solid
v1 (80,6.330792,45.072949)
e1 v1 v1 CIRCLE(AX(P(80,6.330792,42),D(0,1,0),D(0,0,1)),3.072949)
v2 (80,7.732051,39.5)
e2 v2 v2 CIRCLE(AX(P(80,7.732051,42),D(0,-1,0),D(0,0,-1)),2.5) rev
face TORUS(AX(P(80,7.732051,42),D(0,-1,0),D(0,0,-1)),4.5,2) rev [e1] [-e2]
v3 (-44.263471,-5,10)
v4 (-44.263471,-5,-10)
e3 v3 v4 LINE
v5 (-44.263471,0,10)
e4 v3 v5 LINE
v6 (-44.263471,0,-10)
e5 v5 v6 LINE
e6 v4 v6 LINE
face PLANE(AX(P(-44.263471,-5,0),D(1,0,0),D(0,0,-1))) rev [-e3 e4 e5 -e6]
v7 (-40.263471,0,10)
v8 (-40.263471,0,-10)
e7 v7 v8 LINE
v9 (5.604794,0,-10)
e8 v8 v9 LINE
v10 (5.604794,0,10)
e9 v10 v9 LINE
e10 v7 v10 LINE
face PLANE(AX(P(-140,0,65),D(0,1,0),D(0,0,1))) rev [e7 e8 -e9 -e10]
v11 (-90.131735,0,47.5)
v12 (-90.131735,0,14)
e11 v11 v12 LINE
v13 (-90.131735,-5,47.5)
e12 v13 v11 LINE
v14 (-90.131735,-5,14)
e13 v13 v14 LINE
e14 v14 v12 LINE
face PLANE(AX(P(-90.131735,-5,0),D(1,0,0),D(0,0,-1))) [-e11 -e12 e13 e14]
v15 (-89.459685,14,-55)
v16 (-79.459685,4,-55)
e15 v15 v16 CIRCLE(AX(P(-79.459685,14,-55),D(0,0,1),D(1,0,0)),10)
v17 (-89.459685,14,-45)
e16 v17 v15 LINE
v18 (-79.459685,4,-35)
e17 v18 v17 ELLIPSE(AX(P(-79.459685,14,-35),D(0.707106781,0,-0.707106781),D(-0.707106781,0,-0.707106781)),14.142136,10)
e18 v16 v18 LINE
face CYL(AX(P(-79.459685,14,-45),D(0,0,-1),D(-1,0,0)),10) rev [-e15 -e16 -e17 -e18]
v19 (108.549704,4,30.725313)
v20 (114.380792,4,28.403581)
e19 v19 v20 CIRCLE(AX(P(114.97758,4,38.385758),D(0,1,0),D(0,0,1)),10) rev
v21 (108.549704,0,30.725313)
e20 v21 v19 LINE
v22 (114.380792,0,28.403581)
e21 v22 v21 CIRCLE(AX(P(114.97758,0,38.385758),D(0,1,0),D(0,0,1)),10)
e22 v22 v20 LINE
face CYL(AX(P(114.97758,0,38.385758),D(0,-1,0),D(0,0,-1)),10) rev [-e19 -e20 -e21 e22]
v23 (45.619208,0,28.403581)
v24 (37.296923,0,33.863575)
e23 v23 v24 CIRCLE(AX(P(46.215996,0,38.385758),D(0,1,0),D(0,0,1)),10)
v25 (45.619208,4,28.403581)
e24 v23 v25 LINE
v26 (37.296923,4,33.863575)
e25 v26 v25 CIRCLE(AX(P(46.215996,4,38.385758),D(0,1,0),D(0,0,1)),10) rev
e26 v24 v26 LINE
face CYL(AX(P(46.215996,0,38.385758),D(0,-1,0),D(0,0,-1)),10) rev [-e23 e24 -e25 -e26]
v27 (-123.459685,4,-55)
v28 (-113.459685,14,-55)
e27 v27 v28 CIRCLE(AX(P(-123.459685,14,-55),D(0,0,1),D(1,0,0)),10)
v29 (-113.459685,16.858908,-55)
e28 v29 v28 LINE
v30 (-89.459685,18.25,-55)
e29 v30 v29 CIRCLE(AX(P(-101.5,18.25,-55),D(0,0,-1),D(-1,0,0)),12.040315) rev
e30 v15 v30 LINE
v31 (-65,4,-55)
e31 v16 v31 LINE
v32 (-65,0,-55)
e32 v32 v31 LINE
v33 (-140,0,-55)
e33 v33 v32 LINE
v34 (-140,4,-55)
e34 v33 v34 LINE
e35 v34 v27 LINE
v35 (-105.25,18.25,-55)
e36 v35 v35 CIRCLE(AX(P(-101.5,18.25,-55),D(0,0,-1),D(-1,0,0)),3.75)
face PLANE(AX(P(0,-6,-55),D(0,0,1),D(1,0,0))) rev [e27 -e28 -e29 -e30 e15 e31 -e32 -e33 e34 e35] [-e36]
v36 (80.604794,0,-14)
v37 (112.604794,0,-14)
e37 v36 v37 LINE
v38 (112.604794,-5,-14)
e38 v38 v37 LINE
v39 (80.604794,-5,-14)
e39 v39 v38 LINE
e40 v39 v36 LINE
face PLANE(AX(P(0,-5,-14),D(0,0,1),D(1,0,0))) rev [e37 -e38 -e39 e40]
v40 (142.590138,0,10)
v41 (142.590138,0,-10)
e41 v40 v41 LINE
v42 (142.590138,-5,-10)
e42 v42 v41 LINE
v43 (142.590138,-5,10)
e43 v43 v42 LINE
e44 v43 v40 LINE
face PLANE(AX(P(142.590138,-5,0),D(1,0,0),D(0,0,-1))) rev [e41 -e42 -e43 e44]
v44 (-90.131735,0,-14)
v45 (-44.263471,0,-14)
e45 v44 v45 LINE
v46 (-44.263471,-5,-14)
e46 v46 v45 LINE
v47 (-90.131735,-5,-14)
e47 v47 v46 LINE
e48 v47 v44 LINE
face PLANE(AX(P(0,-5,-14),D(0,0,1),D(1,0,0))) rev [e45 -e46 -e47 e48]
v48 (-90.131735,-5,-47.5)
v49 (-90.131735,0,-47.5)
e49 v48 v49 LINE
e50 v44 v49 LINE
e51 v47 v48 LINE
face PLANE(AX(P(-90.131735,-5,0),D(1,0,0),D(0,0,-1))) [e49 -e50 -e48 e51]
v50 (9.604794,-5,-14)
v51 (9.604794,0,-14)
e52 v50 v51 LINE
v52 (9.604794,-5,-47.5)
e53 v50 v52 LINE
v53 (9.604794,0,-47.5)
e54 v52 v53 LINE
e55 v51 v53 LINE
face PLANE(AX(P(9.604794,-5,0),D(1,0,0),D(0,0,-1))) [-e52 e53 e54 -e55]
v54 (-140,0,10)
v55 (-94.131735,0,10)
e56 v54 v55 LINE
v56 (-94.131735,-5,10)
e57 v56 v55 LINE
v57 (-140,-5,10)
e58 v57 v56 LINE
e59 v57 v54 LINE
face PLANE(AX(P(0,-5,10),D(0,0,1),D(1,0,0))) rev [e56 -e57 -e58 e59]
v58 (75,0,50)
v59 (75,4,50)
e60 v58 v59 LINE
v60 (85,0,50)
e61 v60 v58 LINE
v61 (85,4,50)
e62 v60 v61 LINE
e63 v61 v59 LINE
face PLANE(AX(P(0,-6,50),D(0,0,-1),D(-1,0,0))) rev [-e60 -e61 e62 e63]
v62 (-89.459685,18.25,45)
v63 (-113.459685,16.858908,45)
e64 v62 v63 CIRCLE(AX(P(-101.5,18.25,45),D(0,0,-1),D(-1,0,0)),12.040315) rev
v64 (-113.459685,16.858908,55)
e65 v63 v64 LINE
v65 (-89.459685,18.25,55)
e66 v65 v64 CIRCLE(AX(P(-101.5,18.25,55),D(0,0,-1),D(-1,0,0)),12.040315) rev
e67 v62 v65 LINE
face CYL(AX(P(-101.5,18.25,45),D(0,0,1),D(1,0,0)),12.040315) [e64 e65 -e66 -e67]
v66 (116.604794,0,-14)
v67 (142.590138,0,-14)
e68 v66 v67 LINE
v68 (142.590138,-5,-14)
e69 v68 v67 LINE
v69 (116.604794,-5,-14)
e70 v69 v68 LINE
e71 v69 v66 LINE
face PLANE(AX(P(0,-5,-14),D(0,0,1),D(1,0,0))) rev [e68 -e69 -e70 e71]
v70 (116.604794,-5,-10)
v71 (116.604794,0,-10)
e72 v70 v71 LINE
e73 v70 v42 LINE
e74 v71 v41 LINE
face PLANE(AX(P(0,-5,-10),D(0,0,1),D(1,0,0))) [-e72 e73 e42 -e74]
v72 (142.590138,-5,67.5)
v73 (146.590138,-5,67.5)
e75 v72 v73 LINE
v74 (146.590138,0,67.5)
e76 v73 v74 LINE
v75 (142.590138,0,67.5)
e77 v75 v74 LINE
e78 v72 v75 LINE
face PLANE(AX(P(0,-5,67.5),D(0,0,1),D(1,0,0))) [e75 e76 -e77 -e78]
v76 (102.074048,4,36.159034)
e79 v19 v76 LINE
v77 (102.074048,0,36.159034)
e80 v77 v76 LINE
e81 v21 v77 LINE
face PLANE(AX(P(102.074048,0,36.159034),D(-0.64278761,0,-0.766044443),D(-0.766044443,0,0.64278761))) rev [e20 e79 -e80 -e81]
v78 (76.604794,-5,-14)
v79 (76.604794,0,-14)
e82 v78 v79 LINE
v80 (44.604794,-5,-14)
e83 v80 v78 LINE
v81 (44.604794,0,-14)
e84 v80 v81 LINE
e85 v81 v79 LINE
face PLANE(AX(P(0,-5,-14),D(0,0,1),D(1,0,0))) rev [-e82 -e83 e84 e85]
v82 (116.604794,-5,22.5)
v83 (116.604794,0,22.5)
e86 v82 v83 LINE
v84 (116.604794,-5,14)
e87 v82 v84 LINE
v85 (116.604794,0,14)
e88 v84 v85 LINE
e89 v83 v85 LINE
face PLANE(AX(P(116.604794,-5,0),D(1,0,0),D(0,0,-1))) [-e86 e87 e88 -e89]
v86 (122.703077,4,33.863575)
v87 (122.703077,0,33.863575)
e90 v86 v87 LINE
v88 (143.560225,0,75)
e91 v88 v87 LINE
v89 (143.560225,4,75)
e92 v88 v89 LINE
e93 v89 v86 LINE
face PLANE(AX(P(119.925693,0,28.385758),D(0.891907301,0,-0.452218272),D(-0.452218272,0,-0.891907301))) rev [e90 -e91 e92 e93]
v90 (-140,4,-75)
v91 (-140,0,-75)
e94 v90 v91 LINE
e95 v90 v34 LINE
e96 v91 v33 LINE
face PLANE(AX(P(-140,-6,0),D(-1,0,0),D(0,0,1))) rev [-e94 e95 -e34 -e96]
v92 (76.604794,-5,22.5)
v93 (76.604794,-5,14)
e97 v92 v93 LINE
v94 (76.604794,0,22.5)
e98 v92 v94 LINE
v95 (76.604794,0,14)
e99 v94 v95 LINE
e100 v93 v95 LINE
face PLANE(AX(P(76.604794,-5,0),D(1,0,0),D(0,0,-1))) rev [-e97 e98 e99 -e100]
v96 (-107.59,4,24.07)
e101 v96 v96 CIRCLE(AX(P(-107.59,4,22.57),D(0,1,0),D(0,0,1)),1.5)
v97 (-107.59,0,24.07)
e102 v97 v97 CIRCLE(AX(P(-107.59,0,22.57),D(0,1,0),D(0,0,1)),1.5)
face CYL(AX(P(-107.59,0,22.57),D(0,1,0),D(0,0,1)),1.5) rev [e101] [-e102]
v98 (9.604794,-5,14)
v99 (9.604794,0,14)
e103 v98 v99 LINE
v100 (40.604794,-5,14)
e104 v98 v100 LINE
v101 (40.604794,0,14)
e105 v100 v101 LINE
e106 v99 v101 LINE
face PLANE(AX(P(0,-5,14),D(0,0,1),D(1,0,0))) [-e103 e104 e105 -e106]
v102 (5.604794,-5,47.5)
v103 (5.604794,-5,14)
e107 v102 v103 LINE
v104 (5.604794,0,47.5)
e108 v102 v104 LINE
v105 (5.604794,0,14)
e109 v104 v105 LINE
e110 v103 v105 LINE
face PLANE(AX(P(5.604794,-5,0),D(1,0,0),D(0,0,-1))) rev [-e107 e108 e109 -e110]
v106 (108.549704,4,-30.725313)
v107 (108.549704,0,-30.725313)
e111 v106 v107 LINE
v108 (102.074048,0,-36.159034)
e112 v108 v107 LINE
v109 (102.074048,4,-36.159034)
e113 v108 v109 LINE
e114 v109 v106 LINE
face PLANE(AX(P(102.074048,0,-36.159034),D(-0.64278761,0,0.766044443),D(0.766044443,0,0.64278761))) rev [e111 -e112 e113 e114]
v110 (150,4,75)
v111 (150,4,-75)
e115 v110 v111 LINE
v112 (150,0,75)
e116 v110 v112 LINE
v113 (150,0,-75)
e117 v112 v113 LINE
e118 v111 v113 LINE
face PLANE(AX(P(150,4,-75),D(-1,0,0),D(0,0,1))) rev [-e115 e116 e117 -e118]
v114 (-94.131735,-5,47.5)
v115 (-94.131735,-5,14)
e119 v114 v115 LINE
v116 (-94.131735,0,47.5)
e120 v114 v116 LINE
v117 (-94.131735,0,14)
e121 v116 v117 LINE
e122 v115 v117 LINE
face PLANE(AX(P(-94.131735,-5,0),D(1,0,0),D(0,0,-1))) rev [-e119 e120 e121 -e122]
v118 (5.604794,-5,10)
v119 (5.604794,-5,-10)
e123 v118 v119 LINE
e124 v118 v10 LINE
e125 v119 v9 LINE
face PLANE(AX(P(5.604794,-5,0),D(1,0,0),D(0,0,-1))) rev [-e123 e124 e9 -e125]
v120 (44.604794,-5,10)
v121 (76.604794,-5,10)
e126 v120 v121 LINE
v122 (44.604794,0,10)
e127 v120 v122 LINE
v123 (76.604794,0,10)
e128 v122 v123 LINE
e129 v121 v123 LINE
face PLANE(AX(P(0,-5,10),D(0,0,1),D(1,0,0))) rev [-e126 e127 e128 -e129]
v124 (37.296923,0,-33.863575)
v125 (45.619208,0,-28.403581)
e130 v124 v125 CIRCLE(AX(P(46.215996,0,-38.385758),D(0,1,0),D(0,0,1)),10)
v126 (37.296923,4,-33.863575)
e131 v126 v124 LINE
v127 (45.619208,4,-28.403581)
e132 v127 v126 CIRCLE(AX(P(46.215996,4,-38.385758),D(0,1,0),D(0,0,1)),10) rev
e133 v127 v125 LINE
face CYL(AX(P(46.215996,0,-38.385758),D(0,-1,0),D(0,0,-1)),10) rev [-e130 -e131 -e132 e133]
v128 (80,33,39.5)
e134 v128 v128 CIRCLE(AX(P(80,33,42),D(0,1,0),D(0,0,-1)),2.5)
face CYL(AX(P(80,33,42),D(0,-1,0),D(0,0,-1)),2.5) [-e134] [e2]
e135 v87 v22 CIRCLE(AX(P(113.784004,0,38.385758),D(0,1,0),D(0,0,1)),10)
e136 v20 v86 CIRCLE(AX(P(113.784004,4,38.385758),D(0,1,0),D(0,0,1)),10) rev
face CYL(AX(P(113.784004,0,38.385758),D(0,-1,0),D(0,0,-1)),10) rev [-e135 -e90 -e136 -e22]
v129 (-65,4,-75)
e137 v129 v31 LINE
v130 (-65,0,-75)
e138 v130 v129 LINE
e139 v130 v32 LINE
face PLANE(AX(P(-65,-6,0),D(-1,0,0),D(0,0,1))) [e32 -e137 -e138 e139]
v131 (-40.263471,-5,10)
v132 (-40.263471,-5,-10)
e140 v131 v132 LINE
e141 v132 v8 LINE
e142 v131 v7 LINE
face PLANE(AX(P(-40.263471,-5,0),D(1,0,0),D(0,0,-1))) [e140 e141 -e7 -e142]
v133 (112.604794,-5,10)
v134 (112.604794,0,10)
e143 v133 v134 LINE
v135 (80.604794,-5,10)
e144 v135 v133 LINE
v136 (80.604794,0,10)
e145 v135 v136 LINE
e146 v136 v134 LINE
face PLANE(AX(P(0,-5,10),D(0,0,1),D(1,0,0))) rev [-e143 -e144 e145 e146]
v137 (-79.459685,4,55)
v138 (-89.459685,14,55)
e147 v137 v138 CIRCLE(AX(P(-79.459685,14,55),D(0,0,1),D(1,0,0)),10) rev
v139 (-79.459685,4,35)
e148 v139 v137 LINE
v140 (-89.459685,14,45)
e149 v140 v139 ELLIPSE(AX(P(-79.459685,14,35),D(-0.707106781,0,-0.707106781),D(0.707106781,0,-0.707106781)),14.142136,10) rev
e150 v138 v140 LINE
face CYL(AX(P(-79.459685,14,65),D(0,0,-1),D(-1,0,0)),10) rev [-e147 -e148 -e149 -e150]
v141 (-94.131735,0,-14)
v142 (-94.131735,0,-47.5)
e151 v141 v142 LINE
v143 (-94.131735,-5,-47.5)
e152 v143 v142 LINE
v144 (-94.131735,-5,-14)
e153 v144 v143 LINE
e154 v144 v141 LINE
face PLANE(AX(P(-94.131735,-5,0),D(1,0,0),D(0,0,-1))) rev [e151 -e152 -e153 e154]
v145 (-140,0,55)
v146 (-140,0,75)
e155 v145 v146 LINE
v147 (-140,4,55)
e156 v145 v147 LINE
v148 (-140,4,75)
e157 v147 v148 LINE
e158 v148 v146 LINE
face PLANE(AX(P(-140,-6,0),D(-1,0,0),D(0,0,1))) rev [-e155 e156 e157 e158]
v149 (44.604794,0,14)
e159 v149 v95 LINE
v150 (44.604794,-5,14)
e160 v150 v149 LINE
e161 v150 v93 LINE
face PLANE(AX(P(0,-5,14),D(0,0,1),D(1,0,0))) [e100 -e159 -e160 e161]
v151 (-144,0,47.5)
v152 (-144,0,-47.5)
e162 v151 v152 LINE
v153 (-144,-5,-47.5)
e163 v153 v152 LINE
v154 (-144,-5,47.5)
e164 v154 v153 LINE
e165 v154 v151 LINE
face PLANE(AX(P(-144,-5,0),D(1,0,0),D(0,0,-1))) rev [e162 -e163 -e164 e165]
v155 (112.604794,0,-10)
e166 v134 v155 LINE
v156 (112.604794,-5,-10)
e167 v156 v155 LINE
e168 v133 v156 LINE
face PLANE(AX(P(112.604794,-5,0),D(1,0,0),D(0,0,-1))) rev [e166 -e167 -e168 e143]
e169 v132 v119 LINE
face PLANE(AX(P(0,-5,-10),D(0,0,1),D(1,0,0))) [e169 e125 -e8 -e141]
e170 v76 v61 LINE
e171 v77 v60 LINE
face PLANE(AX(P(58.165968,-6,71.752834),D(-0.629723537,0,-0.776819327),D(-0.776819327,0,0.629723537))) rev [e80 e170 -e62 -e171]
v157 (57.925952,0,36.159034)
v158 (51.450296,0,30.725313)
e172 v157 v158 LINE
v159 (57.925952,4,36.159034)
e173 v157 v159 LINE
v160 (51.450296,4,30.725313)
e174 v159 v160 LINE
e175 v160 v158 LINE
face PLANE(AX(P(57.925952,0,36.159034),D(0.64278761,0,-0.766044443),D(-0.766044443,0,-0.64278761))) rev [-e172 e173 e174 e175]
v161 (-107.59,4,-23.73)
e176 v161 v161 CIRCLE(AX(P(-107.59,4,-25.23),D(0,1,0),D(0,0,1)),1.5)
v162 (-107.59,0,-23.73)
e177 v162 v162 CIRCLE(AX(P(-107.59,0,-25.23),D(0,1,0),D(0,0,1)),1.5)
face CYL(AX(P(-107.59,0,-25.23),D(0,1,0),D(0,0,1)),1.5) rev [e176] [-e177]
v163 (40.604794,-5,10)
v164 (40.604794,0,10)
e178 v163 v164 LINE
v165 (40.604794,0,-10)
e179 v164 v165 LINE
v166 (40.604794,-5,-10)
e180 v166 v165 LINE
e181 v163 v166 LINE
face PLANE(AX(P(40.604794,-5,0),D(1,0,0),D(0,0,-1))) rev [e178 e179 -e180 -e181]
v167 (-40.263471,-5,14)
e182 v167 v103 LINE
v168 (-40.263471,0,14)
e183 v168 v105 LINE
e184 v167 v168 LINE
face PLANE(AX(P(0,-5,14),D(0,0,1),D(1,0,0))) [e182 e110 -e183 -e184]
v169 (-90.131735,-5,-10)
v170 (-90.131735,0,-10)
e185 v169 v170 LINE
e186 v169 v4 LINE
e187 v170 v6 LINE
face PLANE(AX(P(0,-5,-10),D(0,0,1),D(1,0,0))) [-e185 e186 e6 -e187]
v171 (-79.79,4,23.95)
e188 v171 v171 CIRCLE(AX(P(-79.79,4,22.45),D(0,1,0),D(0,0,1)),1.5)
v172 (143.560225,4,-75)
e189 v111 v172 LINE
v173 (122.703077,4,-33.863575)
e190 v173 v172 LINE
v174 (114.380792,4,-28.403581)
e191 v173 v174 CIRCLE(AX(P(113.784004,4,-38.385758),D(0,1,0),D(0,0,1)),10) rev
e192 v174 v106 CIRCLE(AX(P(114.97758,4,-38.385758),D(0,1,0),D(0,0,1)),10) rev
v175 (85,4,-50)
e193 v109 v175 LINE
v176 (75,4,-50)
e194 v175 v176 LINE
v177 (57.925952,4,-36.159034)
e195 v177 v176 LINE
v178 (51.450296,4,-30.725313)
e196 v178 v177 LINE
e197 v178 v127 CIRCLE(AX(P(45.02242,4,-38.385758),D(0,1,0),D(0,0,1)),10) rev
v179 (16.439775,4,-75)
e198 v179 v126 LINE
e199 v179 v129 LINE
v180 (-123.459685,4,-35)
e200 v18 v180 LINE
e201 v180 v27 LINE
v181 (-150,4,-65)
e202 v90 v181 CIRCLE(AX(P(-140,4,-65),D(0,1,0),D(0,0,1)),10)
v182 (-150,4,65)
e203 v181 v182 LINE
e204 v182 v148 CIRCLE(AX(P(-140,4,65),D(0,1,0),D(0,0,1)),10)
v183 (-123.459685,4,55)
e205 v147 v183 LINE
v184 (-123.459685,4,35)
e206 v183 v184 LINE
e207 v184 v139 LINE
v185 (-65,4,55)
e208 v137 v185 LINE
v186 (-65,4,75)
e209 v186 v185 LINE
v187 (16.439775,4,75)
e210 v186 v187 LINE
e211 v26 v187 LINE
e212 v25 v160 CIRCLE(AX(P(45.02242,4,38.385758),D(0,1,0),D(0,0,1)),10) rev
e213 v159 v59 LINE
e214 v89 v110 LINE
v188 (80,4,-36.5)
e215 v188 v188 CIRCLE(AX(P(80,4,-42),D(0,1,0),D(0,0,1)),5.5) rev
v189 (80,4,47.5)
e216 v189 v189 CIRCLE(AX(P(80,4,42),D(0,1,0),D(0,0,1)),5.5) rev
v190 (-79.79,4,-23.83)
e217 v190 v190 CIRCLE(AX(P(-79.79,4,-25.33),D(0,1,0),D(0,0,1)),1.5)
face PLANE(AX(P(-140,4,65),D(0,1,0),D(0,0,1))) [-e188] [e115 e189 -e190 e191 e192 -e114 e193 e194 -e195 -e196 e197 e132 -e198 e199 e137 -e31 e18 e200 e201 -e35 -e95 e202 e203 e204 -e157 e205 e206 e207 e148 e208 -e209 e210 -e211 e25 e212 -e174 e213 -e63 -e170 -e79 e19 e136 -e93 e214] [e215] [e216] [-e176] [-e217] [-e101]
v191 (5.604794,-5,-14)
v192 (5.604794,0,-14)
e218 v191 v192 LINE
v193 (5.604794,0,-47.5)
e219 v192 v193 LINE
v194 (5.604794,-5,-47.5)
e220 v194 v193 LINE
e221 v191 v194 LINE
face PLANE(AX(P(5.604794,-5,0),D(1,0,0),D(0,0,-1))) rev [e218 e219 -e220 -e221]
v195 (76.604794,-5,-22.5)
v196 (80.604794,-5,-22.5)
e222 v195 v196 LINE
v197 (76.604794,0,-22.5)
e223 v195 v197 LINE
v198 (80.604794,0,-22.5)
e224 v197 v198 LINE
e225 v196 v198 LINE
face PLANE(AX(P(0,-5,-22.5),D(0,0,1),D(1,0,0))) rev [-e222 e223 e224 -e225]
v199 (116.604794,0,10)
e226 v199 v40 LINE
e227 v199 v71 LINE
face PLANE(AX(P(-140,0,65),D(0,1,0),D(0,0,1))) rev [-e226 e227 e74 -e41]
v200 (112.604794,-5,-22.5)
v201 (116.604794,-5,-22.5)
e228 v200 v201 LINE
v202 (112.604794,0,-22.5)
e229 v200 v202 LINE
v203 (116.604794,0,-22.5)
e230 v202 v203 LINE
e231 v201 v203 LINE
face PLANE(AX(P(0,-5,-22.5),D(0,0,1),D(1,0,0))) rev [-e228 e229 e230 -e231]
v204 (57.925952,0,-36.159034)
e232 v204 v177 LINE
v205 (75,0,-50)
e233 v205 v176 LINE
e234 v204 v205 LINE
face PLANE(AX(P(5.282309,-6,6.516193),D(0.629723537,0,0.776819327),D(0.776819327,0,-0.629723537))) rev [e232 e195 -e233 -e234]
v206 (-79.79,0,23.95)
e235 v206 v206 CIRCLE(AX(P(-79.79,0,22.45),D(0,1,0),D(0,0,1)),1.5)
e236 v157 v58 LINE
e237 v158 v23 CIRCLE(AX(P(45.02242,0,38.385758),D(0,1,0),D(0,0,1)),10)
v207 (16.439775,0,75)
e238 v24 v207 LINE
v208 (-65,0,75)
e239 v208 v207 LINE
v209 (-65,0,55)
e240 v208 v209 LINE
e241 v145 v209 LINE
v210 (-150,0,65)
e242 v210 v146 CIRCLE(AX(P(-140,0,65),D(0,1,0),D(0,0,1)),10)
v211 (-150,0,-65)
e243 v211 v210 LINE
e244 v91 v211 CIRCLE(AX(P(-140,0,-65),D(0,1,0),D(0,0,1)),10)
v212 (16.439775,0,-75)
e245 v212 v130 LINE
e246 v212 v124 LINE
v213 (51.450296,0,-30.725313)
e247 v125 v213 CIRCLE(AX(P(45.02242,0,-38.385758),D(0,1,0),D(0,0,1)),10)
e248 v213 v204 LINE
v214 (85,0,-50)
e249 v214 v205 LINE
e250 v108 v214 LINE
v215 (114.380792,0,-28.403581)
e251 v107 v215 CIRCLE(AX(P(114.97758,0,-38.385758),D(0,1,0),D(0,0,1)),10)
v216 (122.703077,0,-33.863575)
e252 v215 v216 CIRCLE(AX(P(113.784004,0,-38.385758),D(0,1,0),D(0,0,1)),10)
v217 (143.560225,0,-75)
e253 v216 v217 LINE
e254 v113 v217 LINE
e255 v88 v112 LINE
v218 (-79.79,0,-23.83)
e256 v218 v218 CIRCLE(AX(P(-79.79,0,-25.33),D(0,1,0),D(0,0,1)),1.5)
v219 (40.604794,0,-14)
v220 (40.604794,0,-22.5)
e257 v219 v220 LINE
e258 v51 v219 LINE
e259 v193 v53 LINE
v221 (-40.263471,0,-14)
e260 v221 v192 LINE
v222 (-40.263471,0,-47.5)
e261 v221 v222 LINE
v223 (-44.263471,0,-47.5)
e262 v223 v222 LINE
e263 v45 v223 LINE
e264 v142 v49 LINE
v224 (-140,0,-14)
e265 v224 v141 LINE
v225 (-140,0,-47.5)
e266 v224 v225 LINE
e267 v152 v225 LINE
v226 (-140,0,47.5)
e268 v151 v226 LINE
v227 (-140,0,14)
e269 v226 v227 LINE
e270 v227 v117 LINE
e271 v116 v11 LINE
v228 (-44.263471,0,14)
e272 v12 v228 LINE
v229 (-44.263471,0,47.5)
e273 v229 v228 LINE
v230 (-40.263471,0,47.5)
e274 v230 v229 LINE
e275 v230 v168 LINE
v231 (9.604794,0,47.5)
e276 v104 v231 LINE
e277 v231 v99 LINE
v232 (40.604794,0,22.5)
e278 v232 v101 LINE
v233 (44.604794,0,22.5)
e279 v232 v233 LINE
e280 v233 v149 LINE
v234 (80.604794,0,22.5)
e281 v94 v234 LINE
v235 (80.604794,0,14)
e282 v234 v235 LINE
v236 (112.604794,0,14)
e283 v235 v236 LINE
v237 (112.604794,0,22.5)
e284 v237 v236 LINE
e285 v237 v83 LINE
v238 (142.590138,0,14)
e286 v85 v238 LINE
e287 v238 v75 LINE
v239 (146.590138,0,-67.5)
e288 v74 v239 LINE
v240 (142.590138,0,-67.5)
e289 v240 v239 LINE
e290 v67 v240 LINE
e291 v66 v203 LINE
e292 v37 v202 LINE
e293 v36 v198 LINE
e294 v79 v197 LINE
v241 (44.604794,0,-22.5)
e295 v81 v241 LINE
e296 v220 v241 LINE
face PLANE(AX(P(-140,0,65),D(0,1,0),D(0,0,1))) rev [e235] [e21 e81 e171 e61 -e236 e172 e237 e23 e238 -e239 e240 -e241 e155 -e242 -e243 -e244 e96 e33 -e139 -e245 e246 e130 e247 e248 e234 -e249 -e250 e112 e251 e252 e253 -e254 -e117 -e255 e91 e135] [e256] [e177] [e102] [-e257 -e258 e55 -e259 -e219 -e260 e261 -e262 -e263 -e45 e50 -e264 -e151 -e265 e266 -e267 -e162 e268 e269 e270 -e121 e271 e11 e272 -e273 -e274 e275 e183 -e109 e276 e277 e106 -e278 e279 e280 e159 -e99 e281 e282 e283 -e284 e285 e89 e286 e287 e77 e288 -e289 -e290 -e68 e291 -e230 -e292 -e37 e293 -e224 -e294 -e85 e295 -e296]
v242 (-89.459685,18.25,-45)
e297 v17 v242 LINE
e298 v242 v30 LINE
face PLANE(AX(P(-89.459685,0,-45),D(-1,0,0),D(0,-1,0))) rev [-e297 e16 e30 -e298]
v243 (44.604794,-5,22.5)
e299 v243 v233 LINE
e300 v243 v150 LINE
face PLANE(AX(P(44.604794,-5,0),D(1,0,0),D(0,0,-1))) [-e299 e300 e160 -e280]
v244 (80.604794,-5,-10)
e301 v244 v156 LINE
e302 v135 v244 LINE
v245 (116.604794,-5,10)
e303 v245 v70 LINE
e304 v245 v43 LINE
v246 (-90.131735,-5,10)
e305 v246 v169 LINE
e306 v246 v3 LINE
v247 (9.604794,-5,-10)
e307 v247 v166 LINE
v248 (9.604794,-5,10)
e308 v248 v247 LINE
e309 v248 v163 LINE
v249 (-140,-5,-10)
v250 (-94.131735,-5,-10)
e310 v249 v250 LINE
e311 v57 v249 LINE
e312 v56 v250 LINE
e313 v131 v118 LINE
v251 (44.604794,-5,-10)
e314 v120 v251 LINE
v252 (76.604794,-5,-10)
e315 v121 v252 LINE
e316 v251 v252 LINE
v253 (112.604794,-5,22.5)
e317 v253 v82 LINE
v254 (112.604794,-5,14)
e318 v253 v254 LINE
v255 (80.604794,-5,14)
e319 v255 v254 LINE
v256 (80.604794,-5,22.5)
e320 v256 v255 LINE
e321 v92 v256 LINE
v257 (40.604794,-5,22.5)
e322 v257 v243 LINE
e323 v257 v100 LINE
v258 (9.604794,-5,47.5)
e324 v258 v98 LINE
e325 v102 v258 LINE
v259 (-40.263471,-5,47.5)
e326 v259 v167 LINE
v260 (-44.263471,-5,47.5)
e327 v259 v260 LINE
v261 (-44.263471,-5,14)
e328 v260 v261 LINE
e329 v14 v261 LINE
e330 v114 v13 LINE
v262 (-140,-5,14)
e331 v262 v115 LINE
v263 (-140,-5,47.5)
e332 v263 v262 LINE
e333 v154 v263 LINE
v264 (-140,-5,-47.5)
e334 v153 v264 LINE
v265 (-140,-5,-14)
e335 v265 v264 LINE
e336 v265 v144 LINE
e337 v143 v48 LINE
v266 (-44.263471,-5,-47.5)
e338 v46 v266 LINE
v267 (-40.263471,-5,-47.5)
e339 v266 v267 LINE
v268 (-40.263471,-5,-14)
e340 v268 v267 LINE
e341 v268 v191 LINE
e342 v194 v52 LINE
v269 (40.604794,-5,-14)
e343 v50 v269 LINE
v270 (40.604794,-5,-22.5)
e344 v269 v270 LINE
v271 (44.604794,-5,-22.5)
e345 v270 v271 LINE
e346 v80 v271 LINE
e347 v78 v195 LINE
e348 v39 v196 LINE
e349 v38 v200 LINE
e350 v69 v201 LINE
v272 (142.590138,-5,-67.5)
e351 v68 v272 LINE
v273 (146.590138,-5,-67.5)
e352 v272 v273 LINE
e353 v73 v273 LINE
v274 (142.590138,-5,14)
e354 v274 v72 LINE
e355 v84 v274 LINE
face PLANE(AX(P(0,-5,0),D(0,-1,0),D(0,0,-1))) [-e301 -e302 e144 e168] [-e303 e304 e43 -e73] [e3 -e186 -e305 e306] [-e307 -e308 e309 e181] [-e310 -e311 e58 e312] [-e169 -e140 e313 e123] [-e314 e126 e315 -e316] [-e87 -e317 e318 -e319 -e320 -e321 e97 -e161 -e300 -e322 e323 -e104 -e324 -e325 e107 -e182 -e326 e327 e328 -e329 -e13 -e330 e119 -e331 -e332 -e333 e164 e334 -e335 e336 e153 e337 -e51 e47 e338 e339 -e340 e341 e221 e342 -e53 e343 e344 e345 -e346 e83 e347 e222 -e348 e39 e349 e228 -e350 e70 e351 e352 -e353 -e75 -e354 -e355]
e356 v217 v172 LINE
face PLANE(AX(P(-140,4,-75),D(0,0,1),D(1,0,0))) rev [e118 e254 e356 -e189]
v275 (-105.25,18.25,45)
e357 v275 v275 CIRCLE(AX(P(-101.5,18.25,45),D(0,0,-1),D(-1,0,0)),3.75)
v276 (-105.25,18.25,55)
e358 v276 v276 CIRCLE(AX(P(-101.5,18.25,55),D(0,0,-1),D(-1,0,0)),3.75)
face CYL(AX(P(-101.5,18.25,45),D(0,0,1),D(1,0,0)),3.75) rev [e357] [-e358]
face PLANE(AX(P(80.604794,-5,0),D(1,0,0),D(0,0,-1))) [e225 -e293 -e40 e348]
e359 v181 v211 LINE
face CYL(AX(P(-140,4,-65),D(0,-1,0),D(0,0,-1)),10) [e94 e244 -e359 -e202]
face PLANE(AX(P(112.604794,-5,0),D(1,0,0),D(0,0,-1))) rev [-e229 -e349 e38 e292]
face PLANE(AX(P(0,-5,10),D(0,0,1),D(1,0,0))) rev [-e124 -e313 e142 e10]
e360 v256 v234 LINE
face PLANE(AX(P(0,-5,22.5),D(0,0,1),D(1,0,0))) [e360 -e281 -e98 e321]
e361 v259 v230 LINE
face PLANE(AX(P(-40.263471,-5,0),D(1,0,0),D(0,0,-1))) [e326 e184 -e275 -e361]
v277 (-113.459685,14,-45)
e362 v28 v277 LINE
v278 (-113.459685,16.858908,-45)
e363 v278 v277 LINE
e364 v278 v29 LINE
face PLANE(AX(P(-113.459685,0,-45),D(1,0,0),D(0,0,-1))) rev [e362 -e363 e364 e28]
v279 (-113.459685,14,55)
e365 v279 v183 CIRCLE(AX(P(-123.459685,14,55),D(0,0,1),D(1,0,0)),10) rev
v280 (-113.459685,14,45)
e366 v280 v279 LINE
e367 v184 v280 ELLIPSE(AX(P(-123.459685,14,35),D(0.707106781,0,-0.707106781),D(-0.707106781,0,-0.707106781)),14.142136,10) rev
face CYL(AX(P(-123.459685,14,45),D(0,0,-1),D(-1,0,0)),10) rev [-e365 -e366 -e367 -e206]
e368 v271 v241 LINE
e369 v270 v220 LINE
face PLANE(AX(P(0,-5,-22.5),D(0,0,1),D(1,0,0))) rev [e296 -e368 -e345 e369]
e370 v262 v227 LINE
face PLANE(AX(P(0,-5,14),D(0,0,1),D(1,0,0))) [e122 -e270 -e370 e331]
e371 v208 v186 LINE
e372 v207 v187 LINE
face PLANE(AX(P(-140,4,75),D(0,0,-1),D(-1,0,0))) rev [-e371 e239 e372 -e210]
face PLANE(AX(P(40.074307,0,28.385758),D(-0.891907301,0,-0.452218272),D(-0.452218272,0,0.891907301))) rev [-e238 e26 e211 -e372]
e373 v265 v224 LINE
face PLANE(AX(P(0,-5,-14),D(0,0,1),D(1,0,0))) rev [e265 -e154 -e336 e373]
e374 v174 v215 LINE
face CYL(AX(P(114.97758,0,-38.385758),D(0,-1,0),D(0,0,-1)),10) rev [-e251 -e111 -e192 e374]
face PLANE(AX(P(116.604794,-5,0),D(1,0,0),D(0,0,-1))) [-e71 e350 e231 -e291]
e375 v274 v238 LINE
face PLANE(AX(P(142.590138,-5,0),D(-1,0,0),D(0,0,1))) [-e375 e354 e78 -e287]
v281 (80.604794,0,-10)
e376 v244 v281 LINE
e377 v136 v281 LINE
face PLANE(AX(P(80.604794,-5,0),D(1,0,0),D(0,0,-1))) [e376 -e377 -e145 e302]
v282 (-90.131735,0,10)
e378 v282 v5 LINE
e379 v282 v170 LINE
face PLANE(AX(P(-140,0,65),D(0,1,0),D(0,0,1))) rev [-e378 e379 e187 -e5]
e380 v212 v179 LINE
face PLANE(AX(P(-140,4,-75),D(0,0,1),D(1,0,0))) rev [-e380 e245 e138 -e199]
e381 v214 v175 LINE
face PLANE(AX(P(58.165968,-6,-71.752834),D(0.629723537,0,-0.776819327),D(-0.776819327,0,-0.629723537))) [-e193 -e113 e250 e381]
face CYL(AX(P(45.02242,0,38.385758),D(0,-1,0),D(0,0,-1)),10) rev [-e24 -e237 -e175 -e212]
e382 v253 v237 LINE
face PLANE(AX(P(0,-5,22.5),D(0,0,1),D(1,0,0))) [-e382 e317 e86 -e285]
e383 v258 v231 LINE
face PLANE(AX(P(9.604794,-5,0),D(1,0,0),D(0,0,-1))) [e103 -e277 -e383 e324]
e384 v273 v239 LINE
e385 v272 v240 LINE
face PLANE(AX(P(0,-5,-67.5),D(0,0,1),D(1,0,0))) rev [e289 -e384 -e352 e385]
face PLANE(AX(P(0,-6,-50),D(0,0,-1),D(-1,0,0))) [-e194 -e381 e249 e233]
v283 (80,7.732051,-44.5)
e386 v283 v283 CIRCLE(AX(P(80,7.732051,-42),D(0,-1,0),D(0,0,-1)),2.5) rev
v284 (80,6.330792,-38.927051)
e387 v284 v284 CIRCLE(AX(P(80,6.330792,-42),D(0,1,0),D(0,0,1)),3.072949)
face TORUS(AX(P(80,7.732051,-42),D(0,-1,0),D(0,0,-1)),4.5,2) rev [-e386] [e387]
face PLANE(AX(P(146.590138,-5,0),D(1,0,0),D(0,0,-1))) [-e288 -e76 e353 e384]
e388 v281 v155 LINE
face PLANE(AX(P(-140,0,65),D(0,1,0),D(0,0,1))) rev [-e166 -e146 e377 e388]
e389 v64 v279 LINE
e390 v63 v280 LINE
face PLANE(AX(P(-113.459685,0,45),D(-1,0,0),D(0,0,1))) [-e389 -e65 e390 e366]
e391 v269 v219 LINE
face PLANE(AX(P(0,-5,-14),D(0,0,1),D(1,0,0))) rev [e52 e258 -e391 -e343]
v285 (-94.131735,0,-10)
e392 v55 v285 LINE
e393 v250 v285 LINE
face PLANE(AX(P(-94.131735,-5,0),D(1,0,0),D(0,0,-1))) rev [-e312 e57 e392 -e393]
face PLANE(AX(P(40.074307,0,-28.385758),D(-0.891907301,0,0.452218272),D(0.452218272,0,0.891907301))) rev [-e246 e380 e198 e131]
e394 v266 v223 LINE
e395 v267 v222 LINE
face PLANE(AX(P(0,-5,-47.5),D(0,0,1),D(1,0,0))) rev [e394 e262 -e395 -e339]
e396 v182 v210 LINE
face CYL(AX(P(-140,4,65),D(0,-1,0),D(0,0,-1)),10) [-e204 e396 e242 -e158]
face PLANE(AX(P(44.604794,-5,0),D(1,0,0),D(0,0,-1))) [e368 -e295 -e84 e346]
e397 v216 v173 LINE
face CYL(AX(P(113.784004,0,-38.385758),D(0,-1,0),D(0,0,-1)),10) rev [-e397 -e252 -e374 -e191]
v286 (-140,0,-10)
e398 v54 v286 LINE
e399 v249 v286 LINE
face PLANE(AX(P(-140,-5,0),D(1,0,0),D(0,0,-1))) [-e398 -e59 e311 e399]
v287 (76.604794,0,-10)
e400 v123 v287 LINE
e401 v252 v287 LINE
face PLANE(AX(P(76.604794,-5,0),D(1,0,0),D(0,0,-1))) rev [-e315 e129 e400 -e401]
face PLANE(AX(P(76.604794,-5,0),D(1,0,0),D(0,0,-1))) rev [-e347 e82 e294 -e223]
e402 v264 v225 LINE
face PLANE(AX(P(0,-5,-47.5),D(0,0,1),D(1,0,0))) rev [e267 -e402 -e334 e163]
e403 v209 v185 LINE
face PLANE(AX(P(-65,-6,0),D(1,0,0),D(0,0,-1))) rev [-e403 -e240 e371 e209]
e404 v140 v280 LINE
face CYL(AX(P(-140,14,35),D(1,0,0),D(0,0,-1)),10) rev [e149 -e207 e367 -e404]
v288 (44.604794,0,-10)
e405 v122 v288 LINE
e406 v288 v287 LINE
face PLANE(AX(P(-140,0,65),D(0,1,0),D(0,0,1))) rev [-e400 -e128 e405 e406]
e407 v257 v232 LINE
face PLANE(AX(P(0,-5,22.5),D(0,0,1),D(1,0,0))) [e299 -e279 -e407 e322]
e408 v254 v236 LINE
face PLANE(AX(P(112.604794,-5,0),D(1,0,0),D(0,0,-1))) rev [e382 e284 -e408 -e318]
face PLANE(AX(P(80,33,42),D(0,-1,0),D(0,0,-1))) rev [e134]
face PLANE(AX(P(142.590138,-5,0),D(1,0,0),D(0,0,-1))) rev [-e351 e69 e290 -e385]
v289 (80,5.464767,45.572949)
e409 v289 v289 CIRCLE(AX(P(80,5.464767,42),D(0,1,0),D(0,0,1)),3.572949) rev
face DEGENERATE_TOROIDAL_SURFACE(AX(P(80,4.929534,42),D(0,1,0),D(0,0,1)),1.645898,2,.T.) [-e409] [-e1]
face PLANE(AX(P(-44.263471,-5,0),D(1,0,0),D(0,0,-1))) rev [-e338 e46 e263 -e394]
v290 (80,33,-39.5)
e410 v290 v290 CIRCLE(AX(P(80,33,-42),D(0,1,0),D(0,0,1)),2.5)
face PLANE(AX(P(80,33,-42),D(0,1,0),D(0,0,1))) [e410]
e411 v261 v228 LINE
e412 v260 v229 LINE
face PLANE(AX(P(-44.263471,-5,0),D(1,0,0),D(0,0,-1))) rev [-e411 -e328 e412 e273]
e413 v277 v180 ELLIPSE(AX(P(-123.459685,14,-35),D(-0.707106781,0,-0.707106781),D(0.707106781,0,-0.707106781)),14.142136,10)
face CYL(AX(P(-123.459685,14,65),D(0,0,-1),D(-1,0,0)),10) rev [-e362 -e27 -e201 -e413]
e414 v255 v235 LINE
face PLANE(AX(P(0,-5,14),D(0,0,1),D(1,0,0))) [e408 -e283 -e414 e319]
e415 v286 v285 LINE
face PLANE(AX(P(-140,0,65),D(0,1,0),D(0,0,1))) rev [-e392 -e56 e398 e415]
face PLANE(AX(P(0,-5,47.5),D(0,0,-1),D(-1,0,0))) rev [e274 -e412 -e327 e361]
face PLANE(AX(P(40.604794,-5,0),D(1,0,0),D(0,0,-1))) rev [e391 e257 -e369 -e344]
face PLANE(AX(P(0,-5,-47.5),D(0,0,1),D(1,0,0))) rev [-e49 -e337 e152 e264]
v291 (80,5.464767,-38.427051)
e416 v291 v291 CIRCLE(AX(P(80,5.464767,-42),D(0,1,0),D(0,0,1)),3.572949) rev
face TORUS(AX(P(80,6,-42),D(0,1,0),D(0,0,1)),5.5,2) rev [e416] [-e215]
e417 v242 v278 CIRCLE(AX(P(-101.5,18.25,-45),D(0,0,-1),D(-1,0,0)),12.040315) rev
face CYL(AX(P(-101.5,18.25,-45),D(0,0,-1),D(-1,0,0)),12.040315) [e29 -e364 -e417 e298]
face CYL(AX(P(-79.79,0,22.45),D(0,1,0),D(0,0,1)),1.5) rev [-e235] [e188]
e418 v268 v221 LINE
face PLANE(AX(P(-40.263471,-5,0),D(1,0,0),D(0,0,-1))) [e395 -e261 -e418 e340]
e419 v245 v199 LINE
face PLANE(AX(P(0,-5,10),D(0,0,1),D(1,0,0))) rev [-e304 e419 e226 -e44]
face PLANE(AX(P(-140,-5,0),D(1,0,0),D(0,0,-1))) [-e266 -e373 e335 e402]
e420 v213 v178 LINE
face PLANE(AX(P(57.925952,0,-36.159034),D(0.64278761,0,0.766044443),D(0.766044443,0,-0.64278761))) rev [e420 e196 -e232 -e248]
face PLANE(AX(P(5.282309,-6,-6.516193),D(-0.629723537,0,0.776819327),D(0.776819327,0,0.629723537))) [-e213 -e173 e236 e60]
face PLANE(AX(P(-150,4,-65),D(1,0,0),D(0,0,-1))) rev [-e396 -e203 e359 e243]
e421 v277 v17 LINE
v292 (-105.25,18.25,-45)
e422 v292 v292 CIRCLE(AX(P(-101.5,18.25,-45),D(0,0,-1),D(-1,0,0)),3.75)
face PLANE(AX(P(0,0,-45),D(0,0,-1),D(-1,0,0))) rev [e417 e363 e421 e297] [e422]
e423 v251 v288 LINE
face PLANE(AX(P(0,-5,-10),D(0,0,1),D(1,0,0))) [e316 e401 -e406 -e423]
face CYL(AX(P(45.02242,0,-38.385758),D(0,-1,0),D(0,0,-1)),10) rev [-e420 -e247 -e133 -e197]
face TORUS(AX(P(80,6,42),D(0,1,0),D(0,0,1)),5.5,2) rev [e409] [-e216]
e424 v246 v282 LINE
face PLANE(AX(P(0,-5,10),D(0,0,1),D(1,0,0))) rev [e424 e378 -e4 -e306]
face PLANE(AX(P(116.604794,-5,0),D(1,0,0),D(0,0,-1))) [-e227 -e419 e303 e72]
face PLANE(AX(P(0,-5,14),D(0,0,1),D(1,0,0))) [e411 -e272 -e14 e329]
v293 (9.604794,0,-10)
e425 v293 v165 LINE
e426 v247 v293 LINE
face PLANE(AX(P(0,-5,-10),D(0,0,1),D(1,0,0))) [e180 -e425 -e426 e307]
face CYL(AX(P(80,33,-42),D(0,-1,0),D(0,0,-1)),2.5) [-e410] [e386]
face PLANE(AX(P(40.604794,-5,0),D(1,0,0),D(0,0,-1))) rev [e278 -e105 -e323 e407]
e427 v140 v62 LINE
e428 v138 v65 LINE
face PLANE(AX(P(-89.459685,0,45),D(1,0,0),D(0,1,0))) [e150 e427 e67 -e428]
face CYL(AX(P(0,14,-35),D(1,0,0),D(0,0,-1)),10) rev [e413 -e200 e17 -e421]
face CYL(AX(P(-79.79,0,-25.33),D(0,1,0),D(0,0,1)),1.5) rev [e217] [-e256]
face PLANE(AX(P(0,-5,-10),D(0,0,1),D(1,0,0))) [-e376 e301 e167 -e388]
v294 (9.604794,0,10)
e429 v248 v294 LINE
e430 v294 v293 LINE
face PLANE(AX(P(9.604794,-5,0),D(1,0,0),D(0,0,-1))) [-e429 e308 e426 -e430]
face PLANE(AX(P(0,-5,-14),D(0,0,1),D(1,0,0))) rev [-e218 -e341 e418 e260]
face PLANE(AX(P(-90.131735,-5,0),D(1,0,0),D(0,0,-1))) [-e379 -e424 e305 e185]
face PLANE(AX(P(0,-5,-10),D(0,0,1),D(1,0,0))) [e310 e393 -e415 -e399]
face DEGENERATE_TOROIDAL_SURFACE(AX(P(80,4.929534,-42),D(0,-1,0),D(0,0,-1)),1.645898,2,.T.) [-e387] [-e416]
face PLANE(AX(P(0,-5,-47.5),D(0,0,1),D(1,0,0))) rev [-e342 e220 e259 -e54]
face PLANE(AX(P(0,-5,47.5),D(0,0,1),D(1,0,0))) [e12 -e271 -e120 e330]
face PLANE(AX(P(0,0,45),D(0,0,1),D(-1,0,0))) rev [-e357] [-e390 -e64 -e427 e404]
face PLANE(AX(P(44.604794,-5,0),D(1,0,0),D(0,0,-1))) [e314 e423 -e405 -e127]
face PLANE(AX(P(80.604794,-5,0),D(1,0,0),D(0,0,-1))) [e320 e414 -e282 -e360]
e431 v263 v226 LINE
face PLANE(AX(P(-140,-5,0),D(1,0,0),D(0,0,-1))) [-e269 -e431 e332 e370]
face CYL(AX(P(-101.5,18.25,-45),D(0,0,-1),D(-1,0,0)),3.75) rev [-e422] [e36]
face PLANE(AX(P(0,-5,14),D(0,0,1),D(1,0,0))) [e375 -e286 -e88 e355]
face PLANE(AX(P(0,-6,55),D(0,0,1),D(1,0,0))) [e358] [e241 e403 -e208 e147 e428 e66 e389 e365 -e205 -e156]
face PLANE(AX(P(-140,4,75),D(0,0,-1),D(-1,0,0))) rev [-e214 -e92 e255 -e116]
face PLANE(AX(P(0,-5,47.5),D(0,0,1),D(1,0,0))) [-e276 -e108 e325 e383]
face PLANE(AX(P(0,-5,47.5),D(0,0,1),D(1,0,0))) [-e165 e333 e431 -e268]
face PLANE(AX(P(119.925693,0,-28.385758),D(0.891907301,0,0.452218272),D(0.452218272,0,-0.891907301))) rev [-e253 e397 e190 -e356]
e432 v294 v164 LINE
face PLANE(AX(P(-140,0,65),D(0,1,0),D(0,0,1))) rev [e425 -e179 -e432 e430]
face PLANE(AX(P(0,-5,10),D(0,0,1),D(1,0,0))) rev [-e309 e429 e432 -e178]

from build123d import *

# Parameters (mm, degrees)
BOSS_EXTRUDE1_DEPTH      = 4
CROQUIS3_W               = 75
CROQUIS3_H               = 20
CORTAR_EXTRUIR1_DEPTH    = 10
CROQUIS4_R               = 3.5
SALIENTE_EXTRUIR1_DEPTH  = 2
CROQUIS5_R               = 2.5
SALIENTE_EXTRUIR2_DEPTH  = 27
CORTAR_EXTRUIR3_DEPTH    = 171.194006945
REDONDEO2_R              = 2
REDONDEO3_R              = 2
REDONDEO4_R              = 2
REDONDEO5_R              = 2
REDONDEO6_R              = 2
REDONDEO7_R              = 10
CROQUIS9_R               = 1.5
CORTAR_EXTRUIR4_DEPTH    = 171.194006945
CROQUIS15_R              = 3.75
SALIENTE_EXTRUIR3_DEPTH  = 10
REDONDEO8_R              = 10
REDONDEO8_OF_SIMETR_A2_R = 10
CROQUIS16_W              = 45.868264646
CROQUIS16_H              = 20
CROQUIS16_W_2            = 25.985344102
CROQUIS16_W_3            = 31
CROQUIS16_W_4            = 32
SALIENTE_EXTRUIR5_DEPTH  = 5


# Some blends are built 0.0001 mm under size
with BuildPart() as part:
    # Sketch1 → Boss-Extrude1 (new body)
    with BuildSketch(Plane(origin=(0, 0, 0), x_dir=(1, 0, 0), z_dir=(0, 1, 0))):
        with BuildLine():
            Line((70, 75), (150, 75))
            Line((150, 75), (150, 65))
            Line((150, 65), (150, -30))
            Line((150, -30), (150, -75))
            Line((150, -75), (70, -75))
            Line((70, -75), (-140, -75))
            ThreePointArc((-140, -75), (-147.071067812, -72.071067812), (-150, -65))
            Line((-150, -65), (-150, 65))
            ThreePointArc((-150, 65), (-147.071067812, 72.071067812), (-140, 75))
            Line((-140, 75), (70, 75))
        make_face()
    extrude(amount=BOSS_EXTRUDE1_DEPTH)

    # Croquis3 → Cortar-Extruir1 (cut)
    with BuildSketch(Plane(origin=(0, 4, 0), x_dir=(1, 0, 0), z_dir=(0, 1, 0))):
        with Locations((-102.5, 65)):
            Rectangle(CROQUIS3_W, CROQUIS3_H)
        with Locations((-102.5, -65)):
            Rectangle(CROQUIS3_W, CROQUIS3_H)
        Polygon((47.925951559, -36.159033642), (16.439774713, -75), (143.560225287, -75), (112.074048441, -36.159033642), (102.074048441, -36.159033642), (85, -50), (75, -50), (57.925951559, -36.159033642), align=None)
        Polygon((143.560225287, 75), (16.439774713, 75), (47.925951559, 36.159033642), (57.925951559, 36.159033642), (75, 50), (85, 50), (102.074048441, 36.159033642), (112.074048441, 36.159033642), align=None)
    cortar_extruir1 = extrude(amount=-CORTAR_EXTRUIR1_DEPTH, mode=Mode.SUBTRACT)

    # Croquis4 → Saliente-Extruir1 (add)
    with BuildSketch(Plane(origin=(0, 4, 0), x_dir=(1, 0, 0), z_dir=(0, 1, 0))):
        with Locations(Location((80, 42, 0), (0, 0, 270))):
            Circle(CROQUIS4_R)
        with Locations(Location((80, -42, 0), (0, 0, 90))):
            Circle(CROQUIS4_R)
    extrude(amount=SALIENTE_EXTRUIR1_DEPTH)

    # Croquis5 → Saliente-Extruir2 (add)
    with BuildSketch(Plane(origin=(0, 6, 0), x_dir=(1, 0, 0), z_dir=(0, 1, 0))):
        with Locations(Location((80, 42, 0), (0, 0, 270))):
            Circle(CROQUIS5_R)
        with Locations(Location((80, -42, 0), (0, 0, 90))):
            Circle(CROQUIS5_R)
    extrude(amount=SALIENTE_EXTRUIR2_DEPTH)

    # Croquis7 → Cortar-Extruir3 (cut, through all)
    with BuildSketch(Plane(origin=(0, 4, 0), x_dir=(1, 0, 0), z_dir=(0, 1, 0))):
        Polygon((57.925951559, 36.159033642), (48.662122101, 28.38575776), (40.074307196, 28.38575776), (16.439774713, 75), align=None)
        Polygon((16.439774713, -75), (57.925951559, -36.159033642), (48.662122101, -28.38575776), (40.074307196, -28.38575776), align=None)
        Polygon((143.560225287, 75), (102.074048441, 36.159033642), (111.337877899, 28.38575776), (119.925692804, 28.38575776), align=None)
        Polygon((102.074048441, -36.159033642), (111.337877899, -28.38575776), (119.925692804, -28.38575776), (143.560225287, -75), align=None)
    extrude(amount=-CORTAR_EXTRUIR3_DEPTH, mode=Mode.SUBTRACT)

    # Redondeo2
    redondeo2_edges = [part.edges().sort_by_distance(p)[0] for p in [
        (80, 4, -45.5),
    ]]
    fillet(redondeo2_edges, radius=REDONDEO2_R - 0.0001)  # a hair under: the kernel refuses the full size

    # Redondeo3
    # the kernel refuses this fillet: 2 mm, written as the material it adds along each edge
    with BuildSketch(Plane(origin=(80, 6, -42), x_dir=(0, 0, 1), z_dir=(-1, 0, 0))) as redondeo3_piece_1:
        with BuildLine():
            CenterArc((4.5, 1.732050808), REDONDEO3_R, 180, 60)
            Line((2.5, 1.732050808), (2.46, 1.732050808))
            Line((2.46, 1.732050808), (2.46, 0))
            Line((2.46, 0), (2.5, -0.04))
            ThreePointArc((2.5, -0.04), (3, -0.04), (3.48, -0.034641016))
            Line((3.48, -0.034641016), (3.5, 0))
        make_face()
    revolve(axis=Axis((80, 6, -42), (0, 1, 0)))

    # Redondeo4
    redondeo4_edges = [part.edges().sort_by_distance(p)[0] for p in [
        (80, 6, -45.5),
    ]]
    fillet(redondeo4_edges, radius=REDONDEO4_R)

    # Redondeo5
    # the kernel refuses this fillet: 2 mm, written as the material it adds along each edge
    with BuildSketch(Plane(origin=(80, 4, 42), x_dir=(0, 0, -1), z_dir=(1, 0, 0))) as redondeo5_piece_1:
        with BuildLine():
            CenterArc((3.5 + REDONDEO5_R, REDONDEO5_R), REDONDEO5_R, 180, 90)
            Line((3.5, REDONDEO5_R), (3.5 - REDONDEO5_R * 0.02, REDONDEO5_R))
            Line((3.5 - REDONDEO5_R * 0.02, REDONDEO5_R), (3.5 - REDONDEO5_R * 0.02, -REDONDEO5_R * 0.02))
            Line((3.5 - REDONDEO5_R * 0.02, -REDONDEO5_R * 0.02), (3.5 + REDONDEO5_R, -REDONDEO5_R * 0.02))
            Line((3.5 + REDONDEO5_R, -REDONDEO5_R * 0.02), (3.5 + REDONDEO5_R, 0))
        make_face()
    revolve(axis=Axis((80, 4, 42), (0, 1, 0)))
    with BuildSketch(Plane(origin=(80, 6, 42), x_dir=(0, 0, -1), z_dir=(1, 0, 0))) as redondeo5_piece_2:
        with BuildLine():
            CenterArc((4.5, 1.732050808), REDONDEO5_R, 180, 60)
            Line((2.5, 1.732050808), (2.46, 1.732050808))
            Line((2.46, 1.732050808), (2.46, 0))
            Line((2.46, 0), (2.5, -0.04))
            ThreePointArc((2.5, -0.04), (3, -0.04), (3.48, -0.034641016))
            Line((3.48, -0.034641016), (3.5, 0))
        make_face()
    revolve(axis=Axis((80, 6, 42), (0, 1, 0)))

    # Redondeo6
    redondeo6_edges = [part.edges().sort_by_distance(p)[0] for p in [
        (80, 6, 45.5),
    ]]
    fillet(redondeo6_edges, radius=REDONDEO6_R)

    # Redondeo7
    # the kernel refuses this fillet: 10 mm, written as the material it adds along each edge
    with BuildSketch(Plane(origin=(40.074307196, 4, 28.38575776), x_dir=(-0.4522182722164984, 0, 0.8919073013904107), z_dir=(0, -1, 0)), Plane(origin=(119.925692804, 4, 28.38575776), x_dir=(-1, 0, 0), z_dir=(0, -1, 0))) as redondeo7_piece_1:
        with BuildLine():
            CenterArc((REDONDEO7_R * 0.614168901779, -REDONDEO7_R), REDONDEO7_R, 90, 63.113904691)
            Line((-REDONDEO7_R * 0.277738399612, -REDONDEO7_R * 0.547781727784), (0, 0))
            Line((0, 0), (REDONDEO7_R * 0.614168901779, 0))
        make_face()
    extrude(amount=4)
    with BuildSketch(Plane(origin=(48.662122101, 4, 28.38575776), x_dir=(-1, 0, 0), z_dir=(0, -1, 0)), Plane(origin=(111.337877899, 4, 28.38575776), x_dir=(-0.7660444431189768, 0, 0.6427876096865409), z_dir=(0, -1, 0))) as redondeo7_piece_2:
        with BuildLine():
            CenterArc((REDONDEO7_R * 0.363970234266, -REDONDEO7_R), REDONDEO7_R, 90, 40)
            Line((-REDONDEO7_R * 0.27881737542, -REDONDEO7_R * 0.233955556881), (0, 0))
            Line((0, 0), (REDONDEO7_R * 0.363970234266, 0))
        make_face()
    extrude(amount=4)
    with BuildSketch(Plane(origin=(40.074307196, 4, -28.38575776), x_dir=(-0.4522182722164984, 0, -0.8919073013904107), z_dir=(0, -1, 0)), Plane(origin=(119.925692804, 4, -28.38575776), x_dir=(-1, 0, 0), z_dir=(0, -1, 0))) as redondeo7_piece_3:
        with BuildLine():
            CenterArc((REDONDEO7_R * 0.614168901779, REDONDEO7_R), REDONDEO7_R, 206.886095309, 63.113904691)
            Line((-REDONDEO7_R * 0.277738399612, REDONDEO7_R * 0.547781727784), (0, 0))
            Line((0, 0), (REDONDEO7_R * 0.614168901779, 0))
        make_face()
    extrude(amount=4)
    with BuildSketch(Plane(origin=(48.662122101, 4, -28.38575776), x_dir=(-1, 0, 0), z_dir=(0, -1, 0)), Plane(origin=(111.337877899, 4, -28.38575776), x_dir=(-0.7660444431189768, 0, -0.6427876096865409), z_dir=(0, -1, 0))) as redondeo7_piece_4:
        with BuildLine():
            CenterArc((REDONDEO7_R * 0.363970234266, REDONDEO7_R), REDONDEO7_R, 230, 40)
            Line((-REDONDEO7_R * 0.27881737542, REDONDEO7_R * 0.233955556881), (0, 0))
            Line((0, 0), (REDONDEO7_R * 0.363970234266, 0))
        make_face()
    extrude(amount=4)

    # Croquis9 → Cortar-Extruir4 (cut, through all)
    with BuildSketch(Plane(origin=(0, 4, 0), x_dir=(1, 0, 0), z_dir=(0, 1, 0))):
        with Locations(Location((-107.59, 25.23, 0), (0, 0, 270))):
            Circle(CROQUIS9_R)
        with Locations(Location((-79.79, 25.33, 0), (0, 0, 270))):
            Circle(CROQUIS9_R)
        with Locations(Location((-79.79, -22.45, 0), (0, 0, 270))):
            Circle(CROQUIS9_R)
        with Locations(Location((-107.59, -22.57, 0), (0, 0, 270))):
            Circle(CROQUIS9_R)
    extrude(amount=-CORTAR_EXTRUIR4_DEPTH, mode=Mode.SUBTRACT)

    # Croquis15 → Saliente-Extruir3 (add)
    with BuildSketch(Plane(origin=(0, 0, -55), x_dir=(-1, 0, 0), z_dir=(0, 0, -1))):
        with BuildLine():
            Line((89.459684655, 4), (89.459684655, 18.25))
            ThreePointArc((89.459684655, 18.25), (102.19671333, 30.27014077), (113.459684655, 16.858908145))
            Line((113.459684655, 16.858908145), (113.459684655, 4))
            Line((113.459684655, 4), (89.459684655, 4))
        make_face()
        with Locations((101.5, 18.25)):
            Circle(CROQUIS15_R, mode=Mode.SUBTRACT)
    saliente_extruir3 = extrude(amount=-SALIENTE_EXTRUIR3_DEPTH)

    # Redondeo8
    redondeo8_edges = [part.edges().sort_by_distance(p)[0] for p in [
        (-113.459684655, 4, -50),
        (-89.459684655, 4, -50),
        (-101.459684655, 4, -45),
    ]]
    fillet(redondeo8_edges, radius=REDONDEO8_R)

    # Simetría2: Cortar-Extruir1, Saliente-Extruir3 across plane
    add(cortar_extruir1.mirror(Plane.XY), mode=Mode.SUBTRACT)
    add(saliente_extruir3.mirror(Plane.XY))

    # Redondeo8 of Simetría2
    redondeo8_of_simetr_a2_edges = [part.edges().sort_by_distance(p)[0] for p in [
        (-113.459684655, 4, 50),
        (-89.459684655, 4, 50),
        (-101.459684655, 4, 45),
    ]]
    fillet(redondeo8_of_simetr_a2_edges, radius=REDONDEO8_OF_SIMETR_A2_R)

    # Croquis16 → Saliente-Extruir5 (add)
    with BuildSketch(Plane.XZ):
        Polygon((-94.131735354, 47.5), (-94.131735354, 14), (-140, 14), (-140, 47.5), (-144, 47.5), (-144, -47.5), (-140, -47.5), (-140, -14), (-94.131735354, -14), (-94.131735354, -47.5), (-90.131735354, -47.5), (-90.131735354, -14), (-44.263470708, -14), (-44.263470708, -47.5), (-40.263470708, -47.5), (-40.263470708, -14), (5.604793938, -14), (5.604793938, -47.5), (9.604793938, -47.5), (9.604793938, -14), (40.604793938, -14), (40.604793938, -22.5), (44.604793938, -22.5), (44.604793938, -14), (76.604793938, -14), (76.604793938, -22.5), (80.604793938, -22.5), (80.604793938, -14), (112.604793938, -14), (112.604793938, -22.5), (116.604793938, -22.5), (116.604793938, -14), (142.59013804, -14), (142.59013804, -67.5), (146.59013804, -67.5), (146.59013804, -14), (146.59013804, 10), (146.59013804, 14), (146.59013804, 67.5), (142.59013804, 67.5), (142.59013804, 14), (116.604793938, 14), (116.604793938, 22.5), (112.604793938, 22.5), (112.604793938, 14), (80.604793938, 14), (80.604793938, 22.5), (76.604793938, 22.5), (76.604793938, 14), (44.604793938, 14), (44.604793938, 22.5), (40.604793938, 22.5), (40.604793938, 14), (9.604793938, 14), (9.604793938, 47.5), (5.604793938, 47.5), (5.604793938, 14), (-40.263470708, 14), (-40.263470708, 47.5), (-44.263470708, 47.5), (-44.263470708, 14), (-90.131735354, 14), (-90.131735354, 47.5), align=None)
        with Locations((-117.065867677, 0)):
            Rectangle(CROQUIS16_W, CROQUIS16_H, mode=Mode.SUBTRACT)
        with Locations((129.597465989, 0)):
            Rectangle(CROQUIS16_W_2, CROQUIS16_H, mode=Mode.SUBTRACT)
        with Locations((25.104793938, 0)):
            Rectangle(CROQUIS16_W_3, CROQUIS16_H, mode=Mode.SUBTRACT)
        with Locations((60.604793938, 0)):
            Rectangle(CROQUIS16_W_4, CROQUIS16_H, mode=Mode.SUBTRACT)
        with Locations((96.604793938, 0)):
            Rectangle(CROQUIS16_W_4, CROQUIS16_H, mode=Mode.SUBTRACT)
        with Locations((-17.329338385, 0)):
            Rectangle(CROQUIS16_W, CROQUIS16_H, mode=Mode.SUBTRACT)
        with Locations((-67.197603031, 0)):
            Rectangle(CROQUIS16_W, CROQUIS16_H, mode=Mode.SUBTRACT)
    extrude(amount=SALIENTE_EXTRUIR5_DEPTH)


solid = part.part
